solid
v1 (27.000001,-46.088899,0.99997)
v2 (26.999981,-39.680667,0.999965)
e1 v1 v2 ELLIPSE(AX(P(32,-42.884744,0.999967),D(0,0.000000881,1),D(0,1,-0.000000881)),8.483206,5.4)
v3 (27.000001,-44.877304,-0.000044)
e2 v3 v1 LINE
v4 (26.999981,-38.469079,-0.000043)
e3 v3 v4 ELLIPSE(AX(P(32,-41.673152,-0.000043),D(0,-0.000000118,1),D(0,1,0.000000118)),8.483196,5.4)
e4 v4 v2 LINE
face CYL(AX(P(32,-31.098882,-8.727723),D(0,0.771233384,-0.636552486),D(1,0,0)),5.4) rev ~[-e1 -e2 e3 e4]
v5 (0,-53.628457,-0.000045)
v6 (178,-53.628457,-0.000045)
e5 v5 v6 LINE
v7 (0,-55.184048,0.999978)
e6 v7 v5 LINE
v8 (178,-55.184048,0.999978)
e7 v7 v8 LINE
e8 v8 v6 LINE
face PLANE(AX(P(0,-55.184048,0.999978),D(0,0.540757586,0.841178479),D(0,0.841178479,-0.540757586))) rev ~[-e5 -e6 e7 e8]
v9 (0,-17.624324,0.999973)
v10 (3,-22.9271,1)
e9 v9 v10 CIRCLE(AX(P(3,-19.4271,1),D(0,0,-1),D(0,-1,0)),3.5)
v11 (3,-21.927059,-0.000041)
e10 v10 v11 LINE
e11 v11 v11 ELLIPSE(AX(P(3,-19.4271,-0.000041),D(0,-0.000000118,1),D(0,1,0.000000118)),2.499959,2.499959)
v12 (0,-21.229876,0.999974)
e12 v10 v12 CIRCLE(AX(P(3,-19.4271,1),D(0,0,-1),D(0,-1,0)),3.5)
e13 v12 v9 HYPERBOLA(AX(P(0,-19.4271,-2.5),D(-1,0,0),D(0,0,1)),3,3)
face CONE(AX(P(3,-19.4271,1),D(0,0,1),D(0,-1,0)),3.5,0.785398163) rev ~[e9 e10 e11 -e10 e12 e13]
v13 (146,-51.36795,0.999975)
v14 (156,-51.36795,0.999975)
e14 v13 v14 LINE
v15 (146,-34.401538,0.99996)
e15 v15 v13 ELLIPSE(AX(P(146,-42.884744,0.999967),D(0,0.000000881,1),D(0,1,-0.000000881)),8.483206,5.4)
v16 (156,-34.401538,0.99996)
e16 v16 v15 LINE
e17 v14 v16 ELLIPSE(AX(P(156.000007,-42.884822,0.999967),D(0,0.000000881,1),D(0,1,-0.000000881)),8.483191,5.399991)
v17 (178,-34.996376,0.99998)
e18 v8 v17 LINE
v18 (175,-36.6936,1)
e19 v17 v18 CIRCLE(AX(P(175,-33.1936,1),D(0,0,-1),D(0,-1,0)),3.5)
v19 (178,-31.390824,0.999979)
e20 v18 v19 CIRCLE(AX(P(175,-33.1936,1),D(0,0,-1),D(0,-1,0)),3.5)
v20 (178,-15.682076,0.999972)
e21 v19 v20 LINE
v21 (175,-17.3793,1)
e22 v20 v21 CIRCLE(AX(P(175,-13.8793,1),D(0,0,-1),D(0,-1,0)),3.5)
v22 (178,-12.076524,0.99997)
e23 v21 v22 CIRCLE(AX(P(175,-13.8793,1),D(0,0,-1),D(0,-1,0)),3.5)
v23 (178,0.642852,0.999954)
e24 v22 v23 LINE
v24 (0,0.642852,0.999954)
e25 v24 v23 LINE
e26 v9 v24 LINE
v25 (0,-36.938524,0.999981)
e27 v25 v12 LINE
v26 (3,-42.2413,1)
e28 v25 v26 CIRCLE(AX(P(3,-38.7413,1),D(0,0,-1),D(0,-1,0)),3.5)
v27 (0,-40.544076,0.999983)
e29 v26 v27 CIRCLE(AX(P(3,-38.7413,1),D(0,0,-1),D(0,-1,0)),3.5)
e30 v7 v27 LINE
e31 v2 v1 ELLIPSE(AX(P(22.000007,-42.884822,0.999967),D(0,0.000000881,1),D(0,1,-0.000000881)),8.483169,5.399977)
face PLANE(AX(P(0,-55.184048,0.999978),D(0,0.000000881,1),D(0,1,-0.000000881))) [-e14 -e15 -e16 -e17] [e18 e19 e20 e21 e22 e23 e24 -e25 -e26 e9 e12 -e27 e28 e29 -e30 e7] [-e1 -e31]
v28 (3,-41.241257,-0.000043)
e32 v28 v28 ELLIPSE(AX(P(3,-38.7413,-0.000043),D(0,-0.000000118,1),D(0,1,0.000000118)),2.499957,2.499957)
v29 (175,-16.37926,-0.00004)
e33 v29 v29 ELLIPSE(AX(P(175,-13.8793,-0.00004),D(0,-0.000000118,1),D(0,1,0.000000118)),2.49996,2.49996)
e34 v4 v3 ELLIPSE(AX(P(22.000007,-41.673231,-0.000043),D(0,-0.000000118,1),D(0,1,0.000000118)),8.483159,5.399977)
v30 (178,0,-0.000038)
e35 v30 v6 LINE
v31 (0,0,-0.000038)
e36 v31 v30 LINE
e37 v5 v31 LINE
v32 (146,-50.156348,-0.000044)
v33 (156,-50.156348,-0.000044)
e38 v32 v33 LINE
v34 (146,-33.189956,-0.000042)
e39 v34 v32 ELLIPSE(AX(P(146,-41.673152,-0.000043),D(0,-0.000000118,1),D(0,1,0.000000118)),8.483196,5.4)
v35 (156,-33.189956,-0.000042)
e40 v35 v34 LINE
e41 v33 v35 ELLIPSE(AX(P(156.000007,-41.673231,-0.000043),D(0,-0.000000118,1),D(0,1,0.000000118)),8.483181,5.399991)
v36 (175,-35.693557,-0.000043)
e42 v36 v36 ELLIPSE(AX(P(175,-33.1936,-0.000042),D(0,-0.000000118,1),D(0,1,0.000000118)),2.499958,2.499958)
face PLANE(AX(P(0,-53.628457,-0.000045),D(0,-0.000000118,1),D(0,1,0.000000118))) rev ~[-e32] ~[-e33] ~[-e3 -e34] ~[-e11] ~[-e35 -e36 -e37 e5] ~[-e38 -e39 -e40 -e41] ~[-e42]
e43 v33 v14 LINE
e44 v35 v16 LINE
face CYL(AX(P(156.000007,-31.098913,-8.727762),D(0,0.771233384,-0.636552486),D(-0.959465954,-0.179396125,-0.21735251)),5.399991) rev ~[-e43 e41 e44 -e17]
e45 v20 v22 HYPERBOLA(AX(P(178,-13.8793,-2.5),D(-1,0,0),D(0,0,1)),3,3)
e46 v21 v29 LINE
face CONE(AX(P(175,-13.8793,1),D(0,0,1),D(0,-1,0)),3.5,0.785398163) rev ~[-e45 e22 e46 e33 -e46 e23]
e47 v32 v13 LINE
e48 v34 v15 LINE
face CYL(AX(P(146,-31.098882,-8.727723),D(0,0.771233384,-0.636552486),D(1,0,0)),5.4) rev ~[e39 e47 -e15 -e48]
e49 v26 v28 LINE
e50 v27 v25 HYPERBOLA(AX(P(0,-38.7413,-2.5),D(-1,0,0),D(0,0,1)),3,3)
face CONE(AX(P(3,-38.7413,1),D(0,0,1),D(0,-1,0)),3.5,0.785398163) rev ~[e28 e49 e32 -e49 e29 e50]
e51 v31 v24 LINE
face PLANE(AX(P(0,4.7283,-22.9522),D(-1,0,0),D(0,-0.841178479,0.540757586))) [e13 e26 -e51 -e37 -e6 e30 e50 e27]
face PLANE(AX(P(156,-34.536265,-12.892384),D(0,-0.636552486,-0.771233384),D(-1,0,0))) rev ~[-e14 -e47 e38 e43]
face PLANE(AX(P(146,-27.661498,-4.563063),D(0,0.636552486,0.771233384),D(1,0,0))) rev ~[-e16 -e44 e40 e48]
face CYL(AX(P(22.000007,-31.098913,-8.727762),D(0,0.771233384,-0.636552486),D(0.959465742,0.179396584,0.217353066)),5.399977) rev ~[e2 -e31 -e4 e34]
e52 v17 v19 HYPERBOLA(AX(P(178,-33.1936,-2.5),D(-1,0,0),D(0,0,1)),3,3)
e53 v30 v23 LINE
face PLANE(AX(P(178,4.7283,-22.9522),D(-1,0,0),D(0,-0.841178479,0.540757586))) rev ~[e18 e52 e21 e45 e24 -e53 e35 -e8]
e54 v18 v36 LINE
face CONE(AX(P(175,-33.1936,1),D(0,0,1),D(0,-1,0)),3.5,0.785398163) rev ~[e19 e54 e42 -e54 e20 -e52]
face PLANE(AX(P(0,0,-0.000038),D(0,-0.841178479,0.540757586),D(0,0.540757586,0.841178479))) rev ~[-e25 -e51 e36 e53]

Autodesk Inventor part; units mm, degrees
ref_plane "Work Plane1" through (0, 4.7283, -22.9522) normal (-1, 0, 0) x (0, -0.8411785, 0.5407576)
sketch "Sketch1" plane through (0, 4.7283, -22.9522) normal (-1, 0, 0) x (0, -0.8411785, 0.5407576)
  line L0 (61.5, -12.25) -> (61.5, -16.75) projected
  line L1 (61.5, -16.75) -> (65.5, -16.75) projected
  line L2 (65.5, -16.75) -> (65.5, -20.25) projected
  line L3 (65.5, -20.25) -> (79.5, -20.25) projected
  line L4 (79.5, -20.25) -> (65.5, -11.25) projected
  line L5 (65.5, -11.25) -> (65.5, -12.25) projected
  line L6 (65.5, -12.25) -> (61.5, -12.25) projected
  line L7 (16.3889, 16.75) -> (16.3889, 18.75) projected
  line L8 (14.7421, 12.75) -> (16.3889, 18.75)
  line L9 (63.3493, -12.25) -> (12.0798, 20.7089)
  line L10 (16.3889, 16.75) -> (16.3889, 17.9388)
  arc A0 (-57.551, -16.75) -> (-61.5, -12.801) centre (-58.75, -14) ccw projected
  arc A1 (-34.301, -16.75) -> (-36.699, -16.75) centre (-35.5, -14) ccw projected
  line L11 (61.5, -12.25) -> (16.3889, 16.75) projected
  line L12 (16.3889, 13.75) -> (-61.5, 13.75) projected
  line L13 (-61.5, 13.75) -> (-61.5, -12.801) projected
  line L14 (-61.5, 13.75) -> (-61.5, -12.801) projected
  arc A2 (-57.551, -16.75) -> (-61.5, -12.801) centre (-58.75, -14) ccw projected
  line L15 (-57.551, -16.75) -> (-36.699, -16.75) projected
  arc A3 (-34.301, -16.75) -> (-36.699, -16.75) centre (-35.5, -14) ccw projected
  line L16 (-34.301, -16.75) -> (61.5, -16.75) projected
  line L17 (61.5, -16.75) -> (61.5, -12.25) projected
  line L18 (21.0556, 13.75) -> (-61.5, 13.75) projected
  line L19 (-57.551, -16.75) -> (-36.699, -16.75) projected
  line L20 (-34.301, -16.75) -> (61.5, -16.75) projected
  line L21 (61.5, -16.75) -> (61.5, -12.25) projected
  line L22 (61.5, -12.25) -> (21.0556, 13.75) projected
  point P0 (16.3889, 17.9388)
  point P1 (15.5655, 15.75)
  point P2 (16.3889, 17.9388)
  point P3 (16.1996, 18.0605)
  dimension "d14" = 1
  dimension "d15" = 2
ref_plane "Work Plane2" through (178, -56.0619, -70.2985) normal (1, 0, 0) x (0, 0.8411785, -0.5407576)
extrude "Extrusion1" add sketch "Sketch1" against normal up to surface (178 mm away) contours L11 L7 L9 L6
sketch "Sketch2" plane through (0, -55.184, 1) normal (0, 0, 1) x (1, 0, 0)
  circle A0 centre (3, 16.4427) radius 2.5 projected
  circle A1 centre (3, 35.7569) radius 2.5 projected
  line L0 (0, 2.3333) -> (0, 55.184) projected
  line L1 (0, 2.3333) -> (3, 2.3333) projected
  line L2 (6, 50.414) -> (6, 9.4662) projected
  line L3 (0, 50.414) -> (6, 50.414) projected
  circle A2 centre (175, 21.9904) radius 2.5 projected
  circle A3 centre (175, 41.3047) radius 2.5 projected
  line L4 (178, 2.3333) -> (178, 55.9618) projected
  line L5 (178, 55.9618) -> (172, 55.9618) projected
  line L6 (172, 55.9618) -> (172, 2.3333) projected
  line L7 (178, 2.3333) -> (172, 2.3333) projected
  line L8 (3, 9.4662) -> (3, 2.3333) projected
  line L9 (3, 9.4662) -> (6, 9.4662) projected
  point P0 (3, 35.7569)
  point P1 (3, 16.4427)
hole "Hole1" at (3, -19.4271, 1) at (3, -38.7413, 1) at (175, -33.1936, 1) at (175, -13.8793, 1) direction (0, 0, -1) diameter 3.6 end through all countersink diameter 7 countersink angle 90 clearance for "Countersunk Flat Head Screw ISO 2009/7046" size "M3" standard "ISO"
ref_plane "Work Plane3" through (22, -31.0502, -8.6656) normal (0, -0.7712334, 0.6365525) x (1, 0, 0)
sketch "Sketch3" plane through (22, -31.0502, -8.6656) normal (0, -0.7712334, 0.6365525) x (1, 0, 0)
  line L0 (-9.9215, 5.3729) -> (-9.9215, -5.5323)
  spline S0 degree 3 poles (-9.9215, -5.5323) (-9.9222, -5.6561) (-9.8204, -5.8999) (-9.5772, -6.0011) (-9.4534, -6.0004) knots 0 0 0 0 0.5 1 1 1 1
  line L1 (-9.4534, -6.0004) -> (19.4534, -6.0004)
  spline S1 degree 3 poles (19.4534, -6.0004) (19.5775, -6.0011) (19.8219, -5.8989) (19.9222, -5.6548) (19.9215, -5.5307) knots 0 0 0 0 0.5 1 1 1 1
  line L2 (19.9215, -5.5307) -> (19.9215, 5.3744)
  spline S2 degree 3 poles (19.9215, 5.3744) (19.9222, 5.4985) (19.82, 5.743) (19.5758, 5.8433) (19.4518, 5.8426) knots 0 0 0 0 0.5 1 1 1 1
  line L3 (19.4518, 5.8426) -> (-9.4534, 5.8426)
  spline S3 degree 3 poles (-9.4534, 5.8426) (-9.5775, 5.8433) (-9.8219, 5.7411) (-9.9222, 5.4969) (-9.9215, 5.3729) knots 0 0 0 0 0.5 1 1 1 1
  circle A0 centre (-8.3791, -4.458) radius 0.5
  circle A1 centre (-8.3791, 4.3001) radius 0.5
  circle A2 centre (18.3791, 4.3001) radius 0.5
  circle A3 centre (18.3791, -4.458) radius 0.5
  arc A4 (5.2617, -1.5301) -> (5.1811, -1.6008) centre (5.2771, -1.6289) ccw
  arc A5 (5.1811, 1.4429) -> (5.1811, -1.6008) centre (0, -0.0789) ccw
  arc A6 (5.1811, 1.4429) -> (5.2617, 1.3723) centre (5.2771, 1.4711) ccw
  arc A7 (5.2617, 1.3723) -> (5.3414, 1.4401) centre (5.2463, 1.4711) ccw
  arc A8 (5.3414, -1.5979) -> (5.3414, 1.4401) centre (10, -0.0789) ccw
  arc A9 (5.3414, -1.5979) -> (5.2617, -1.5301) centre (5.2463, -1.6289) ccw
  line L4 (143.9215, 5.3729) -> (143.9215, -5.5323)
  spline S4 degree 3 poles (143.4534, 5.8426) (143.5775, 5.8433) (143.8219, 5.7411) (143.9222, 5.4969) (143.9215, 5.3729) knots 0 0 0 0 0.5 1 1 1 1
  line L5 (114.5482, 5.8426) -> (143.4534, 5.8426)
  spline S5 degree 3 poles (114.0785, 5.3744) (114.0778, 5.4985) (114.18, 5.743) (114.4242, 5.8433) (114.5482, 5.8426) knots 0 0 0 0 0.5 1 1 1 1
  line L6 (114.0785, -5.5307) -> (114.0785, 5.3744)
  spline S6 degree 3 poles (114.5466, -6.0004) (114.4225, -6.0011) (114.1781, -5.8989) (114.0778, -5.6548) (114.0785, -5.5307) knots 0 0 0 0 0.5 1 1 1 1
  line L7 (143.4534, -6.0004) -> (114.5466, -6.0004)
  spline S7 degree 3 poles (143.9215, -5.5323) (143.9222, -5.6561) (143.8204, -5.8999) (143.5772, -6.0011) (143.4534, -6.0004) knots 0 0 0 0 0.5 1 1 1 1
  circle A10 centre (142.3791, -4.458) radius 0.5
  circle A11 centre (142.3791, 4.3001) radius 0.5
  circle A12 centre (115.6209, 4.3001) radius 0.5
  circle A13 centre (115.6209, -4.458) radius 0.5
  arc A14 (128.8189, -1.6008) -> (128.7383, -1.5301) centre (128.7229, -1.6289) ccw
  arc A15 (128.7383, -1.5301) -> (128.6586, -1.5979) centre (128.7537, -1.6289) ccw
  arc A16 (128.6586, 1.4401) -> (128.6586, -1.5979) centre (124, -0.0789) ccw
  arc A17 (128.6586, 1.4401) -> (128.7383, 1.3723) centre (128.7537, 1.4711) ccw
  arc A18 (128.7383, 1.3723) -> (128.8189, 1.4429) centre (128.7229, 1.4711) ccw
  arc A19 (128.8189, -1.6008) -> (128.8189, 1.4429) centre (134, -0.0789) ccw
  circle A20 centre (10, -0.0789) radius 5.4
  circle A21 centre (124, -0.0789) radius 5.4
  line L8 (0, 5.3211) -> (10, 5.3211)
  line L9 (10, -5.4789) -> (0, -5.4789)
  line L10 (124, 5.3211) -> (134, 5.3211)
  line L11 (134, -5.4789) -> (124, -5.4789)
  point P0 (-22, 26.4483)
  point P1 (14.6373, -1.6617)
  point P2 (5, 1.9607)
  point P3 (5.3627, -1.6617)
  point P4 (5, -2.1185)
  point P5 (7.5029, -4.2949)
  point P6 (3.3743, -4.2949)
  point P7 (5.2923, -1.5401)
  dimension "d9" = 10.8
  dimension "d10" = 10.8
extrude "Extrusion2" cut sketch "Sketch3" along normal blind 78.25 contours A9 A8 A7 A6 A5 A20 A4 | A4 A5 A20 A6 A7 A8 A9 | A5 A20 | A19 A21 A18 A17 A16 A15 A14 | A14 A15 A16 A17 A18 A19 A21 | A21 A19 | A19 L11 A21 | A19 A21 L10
properties part number "front" material "Aluminum 6061"
